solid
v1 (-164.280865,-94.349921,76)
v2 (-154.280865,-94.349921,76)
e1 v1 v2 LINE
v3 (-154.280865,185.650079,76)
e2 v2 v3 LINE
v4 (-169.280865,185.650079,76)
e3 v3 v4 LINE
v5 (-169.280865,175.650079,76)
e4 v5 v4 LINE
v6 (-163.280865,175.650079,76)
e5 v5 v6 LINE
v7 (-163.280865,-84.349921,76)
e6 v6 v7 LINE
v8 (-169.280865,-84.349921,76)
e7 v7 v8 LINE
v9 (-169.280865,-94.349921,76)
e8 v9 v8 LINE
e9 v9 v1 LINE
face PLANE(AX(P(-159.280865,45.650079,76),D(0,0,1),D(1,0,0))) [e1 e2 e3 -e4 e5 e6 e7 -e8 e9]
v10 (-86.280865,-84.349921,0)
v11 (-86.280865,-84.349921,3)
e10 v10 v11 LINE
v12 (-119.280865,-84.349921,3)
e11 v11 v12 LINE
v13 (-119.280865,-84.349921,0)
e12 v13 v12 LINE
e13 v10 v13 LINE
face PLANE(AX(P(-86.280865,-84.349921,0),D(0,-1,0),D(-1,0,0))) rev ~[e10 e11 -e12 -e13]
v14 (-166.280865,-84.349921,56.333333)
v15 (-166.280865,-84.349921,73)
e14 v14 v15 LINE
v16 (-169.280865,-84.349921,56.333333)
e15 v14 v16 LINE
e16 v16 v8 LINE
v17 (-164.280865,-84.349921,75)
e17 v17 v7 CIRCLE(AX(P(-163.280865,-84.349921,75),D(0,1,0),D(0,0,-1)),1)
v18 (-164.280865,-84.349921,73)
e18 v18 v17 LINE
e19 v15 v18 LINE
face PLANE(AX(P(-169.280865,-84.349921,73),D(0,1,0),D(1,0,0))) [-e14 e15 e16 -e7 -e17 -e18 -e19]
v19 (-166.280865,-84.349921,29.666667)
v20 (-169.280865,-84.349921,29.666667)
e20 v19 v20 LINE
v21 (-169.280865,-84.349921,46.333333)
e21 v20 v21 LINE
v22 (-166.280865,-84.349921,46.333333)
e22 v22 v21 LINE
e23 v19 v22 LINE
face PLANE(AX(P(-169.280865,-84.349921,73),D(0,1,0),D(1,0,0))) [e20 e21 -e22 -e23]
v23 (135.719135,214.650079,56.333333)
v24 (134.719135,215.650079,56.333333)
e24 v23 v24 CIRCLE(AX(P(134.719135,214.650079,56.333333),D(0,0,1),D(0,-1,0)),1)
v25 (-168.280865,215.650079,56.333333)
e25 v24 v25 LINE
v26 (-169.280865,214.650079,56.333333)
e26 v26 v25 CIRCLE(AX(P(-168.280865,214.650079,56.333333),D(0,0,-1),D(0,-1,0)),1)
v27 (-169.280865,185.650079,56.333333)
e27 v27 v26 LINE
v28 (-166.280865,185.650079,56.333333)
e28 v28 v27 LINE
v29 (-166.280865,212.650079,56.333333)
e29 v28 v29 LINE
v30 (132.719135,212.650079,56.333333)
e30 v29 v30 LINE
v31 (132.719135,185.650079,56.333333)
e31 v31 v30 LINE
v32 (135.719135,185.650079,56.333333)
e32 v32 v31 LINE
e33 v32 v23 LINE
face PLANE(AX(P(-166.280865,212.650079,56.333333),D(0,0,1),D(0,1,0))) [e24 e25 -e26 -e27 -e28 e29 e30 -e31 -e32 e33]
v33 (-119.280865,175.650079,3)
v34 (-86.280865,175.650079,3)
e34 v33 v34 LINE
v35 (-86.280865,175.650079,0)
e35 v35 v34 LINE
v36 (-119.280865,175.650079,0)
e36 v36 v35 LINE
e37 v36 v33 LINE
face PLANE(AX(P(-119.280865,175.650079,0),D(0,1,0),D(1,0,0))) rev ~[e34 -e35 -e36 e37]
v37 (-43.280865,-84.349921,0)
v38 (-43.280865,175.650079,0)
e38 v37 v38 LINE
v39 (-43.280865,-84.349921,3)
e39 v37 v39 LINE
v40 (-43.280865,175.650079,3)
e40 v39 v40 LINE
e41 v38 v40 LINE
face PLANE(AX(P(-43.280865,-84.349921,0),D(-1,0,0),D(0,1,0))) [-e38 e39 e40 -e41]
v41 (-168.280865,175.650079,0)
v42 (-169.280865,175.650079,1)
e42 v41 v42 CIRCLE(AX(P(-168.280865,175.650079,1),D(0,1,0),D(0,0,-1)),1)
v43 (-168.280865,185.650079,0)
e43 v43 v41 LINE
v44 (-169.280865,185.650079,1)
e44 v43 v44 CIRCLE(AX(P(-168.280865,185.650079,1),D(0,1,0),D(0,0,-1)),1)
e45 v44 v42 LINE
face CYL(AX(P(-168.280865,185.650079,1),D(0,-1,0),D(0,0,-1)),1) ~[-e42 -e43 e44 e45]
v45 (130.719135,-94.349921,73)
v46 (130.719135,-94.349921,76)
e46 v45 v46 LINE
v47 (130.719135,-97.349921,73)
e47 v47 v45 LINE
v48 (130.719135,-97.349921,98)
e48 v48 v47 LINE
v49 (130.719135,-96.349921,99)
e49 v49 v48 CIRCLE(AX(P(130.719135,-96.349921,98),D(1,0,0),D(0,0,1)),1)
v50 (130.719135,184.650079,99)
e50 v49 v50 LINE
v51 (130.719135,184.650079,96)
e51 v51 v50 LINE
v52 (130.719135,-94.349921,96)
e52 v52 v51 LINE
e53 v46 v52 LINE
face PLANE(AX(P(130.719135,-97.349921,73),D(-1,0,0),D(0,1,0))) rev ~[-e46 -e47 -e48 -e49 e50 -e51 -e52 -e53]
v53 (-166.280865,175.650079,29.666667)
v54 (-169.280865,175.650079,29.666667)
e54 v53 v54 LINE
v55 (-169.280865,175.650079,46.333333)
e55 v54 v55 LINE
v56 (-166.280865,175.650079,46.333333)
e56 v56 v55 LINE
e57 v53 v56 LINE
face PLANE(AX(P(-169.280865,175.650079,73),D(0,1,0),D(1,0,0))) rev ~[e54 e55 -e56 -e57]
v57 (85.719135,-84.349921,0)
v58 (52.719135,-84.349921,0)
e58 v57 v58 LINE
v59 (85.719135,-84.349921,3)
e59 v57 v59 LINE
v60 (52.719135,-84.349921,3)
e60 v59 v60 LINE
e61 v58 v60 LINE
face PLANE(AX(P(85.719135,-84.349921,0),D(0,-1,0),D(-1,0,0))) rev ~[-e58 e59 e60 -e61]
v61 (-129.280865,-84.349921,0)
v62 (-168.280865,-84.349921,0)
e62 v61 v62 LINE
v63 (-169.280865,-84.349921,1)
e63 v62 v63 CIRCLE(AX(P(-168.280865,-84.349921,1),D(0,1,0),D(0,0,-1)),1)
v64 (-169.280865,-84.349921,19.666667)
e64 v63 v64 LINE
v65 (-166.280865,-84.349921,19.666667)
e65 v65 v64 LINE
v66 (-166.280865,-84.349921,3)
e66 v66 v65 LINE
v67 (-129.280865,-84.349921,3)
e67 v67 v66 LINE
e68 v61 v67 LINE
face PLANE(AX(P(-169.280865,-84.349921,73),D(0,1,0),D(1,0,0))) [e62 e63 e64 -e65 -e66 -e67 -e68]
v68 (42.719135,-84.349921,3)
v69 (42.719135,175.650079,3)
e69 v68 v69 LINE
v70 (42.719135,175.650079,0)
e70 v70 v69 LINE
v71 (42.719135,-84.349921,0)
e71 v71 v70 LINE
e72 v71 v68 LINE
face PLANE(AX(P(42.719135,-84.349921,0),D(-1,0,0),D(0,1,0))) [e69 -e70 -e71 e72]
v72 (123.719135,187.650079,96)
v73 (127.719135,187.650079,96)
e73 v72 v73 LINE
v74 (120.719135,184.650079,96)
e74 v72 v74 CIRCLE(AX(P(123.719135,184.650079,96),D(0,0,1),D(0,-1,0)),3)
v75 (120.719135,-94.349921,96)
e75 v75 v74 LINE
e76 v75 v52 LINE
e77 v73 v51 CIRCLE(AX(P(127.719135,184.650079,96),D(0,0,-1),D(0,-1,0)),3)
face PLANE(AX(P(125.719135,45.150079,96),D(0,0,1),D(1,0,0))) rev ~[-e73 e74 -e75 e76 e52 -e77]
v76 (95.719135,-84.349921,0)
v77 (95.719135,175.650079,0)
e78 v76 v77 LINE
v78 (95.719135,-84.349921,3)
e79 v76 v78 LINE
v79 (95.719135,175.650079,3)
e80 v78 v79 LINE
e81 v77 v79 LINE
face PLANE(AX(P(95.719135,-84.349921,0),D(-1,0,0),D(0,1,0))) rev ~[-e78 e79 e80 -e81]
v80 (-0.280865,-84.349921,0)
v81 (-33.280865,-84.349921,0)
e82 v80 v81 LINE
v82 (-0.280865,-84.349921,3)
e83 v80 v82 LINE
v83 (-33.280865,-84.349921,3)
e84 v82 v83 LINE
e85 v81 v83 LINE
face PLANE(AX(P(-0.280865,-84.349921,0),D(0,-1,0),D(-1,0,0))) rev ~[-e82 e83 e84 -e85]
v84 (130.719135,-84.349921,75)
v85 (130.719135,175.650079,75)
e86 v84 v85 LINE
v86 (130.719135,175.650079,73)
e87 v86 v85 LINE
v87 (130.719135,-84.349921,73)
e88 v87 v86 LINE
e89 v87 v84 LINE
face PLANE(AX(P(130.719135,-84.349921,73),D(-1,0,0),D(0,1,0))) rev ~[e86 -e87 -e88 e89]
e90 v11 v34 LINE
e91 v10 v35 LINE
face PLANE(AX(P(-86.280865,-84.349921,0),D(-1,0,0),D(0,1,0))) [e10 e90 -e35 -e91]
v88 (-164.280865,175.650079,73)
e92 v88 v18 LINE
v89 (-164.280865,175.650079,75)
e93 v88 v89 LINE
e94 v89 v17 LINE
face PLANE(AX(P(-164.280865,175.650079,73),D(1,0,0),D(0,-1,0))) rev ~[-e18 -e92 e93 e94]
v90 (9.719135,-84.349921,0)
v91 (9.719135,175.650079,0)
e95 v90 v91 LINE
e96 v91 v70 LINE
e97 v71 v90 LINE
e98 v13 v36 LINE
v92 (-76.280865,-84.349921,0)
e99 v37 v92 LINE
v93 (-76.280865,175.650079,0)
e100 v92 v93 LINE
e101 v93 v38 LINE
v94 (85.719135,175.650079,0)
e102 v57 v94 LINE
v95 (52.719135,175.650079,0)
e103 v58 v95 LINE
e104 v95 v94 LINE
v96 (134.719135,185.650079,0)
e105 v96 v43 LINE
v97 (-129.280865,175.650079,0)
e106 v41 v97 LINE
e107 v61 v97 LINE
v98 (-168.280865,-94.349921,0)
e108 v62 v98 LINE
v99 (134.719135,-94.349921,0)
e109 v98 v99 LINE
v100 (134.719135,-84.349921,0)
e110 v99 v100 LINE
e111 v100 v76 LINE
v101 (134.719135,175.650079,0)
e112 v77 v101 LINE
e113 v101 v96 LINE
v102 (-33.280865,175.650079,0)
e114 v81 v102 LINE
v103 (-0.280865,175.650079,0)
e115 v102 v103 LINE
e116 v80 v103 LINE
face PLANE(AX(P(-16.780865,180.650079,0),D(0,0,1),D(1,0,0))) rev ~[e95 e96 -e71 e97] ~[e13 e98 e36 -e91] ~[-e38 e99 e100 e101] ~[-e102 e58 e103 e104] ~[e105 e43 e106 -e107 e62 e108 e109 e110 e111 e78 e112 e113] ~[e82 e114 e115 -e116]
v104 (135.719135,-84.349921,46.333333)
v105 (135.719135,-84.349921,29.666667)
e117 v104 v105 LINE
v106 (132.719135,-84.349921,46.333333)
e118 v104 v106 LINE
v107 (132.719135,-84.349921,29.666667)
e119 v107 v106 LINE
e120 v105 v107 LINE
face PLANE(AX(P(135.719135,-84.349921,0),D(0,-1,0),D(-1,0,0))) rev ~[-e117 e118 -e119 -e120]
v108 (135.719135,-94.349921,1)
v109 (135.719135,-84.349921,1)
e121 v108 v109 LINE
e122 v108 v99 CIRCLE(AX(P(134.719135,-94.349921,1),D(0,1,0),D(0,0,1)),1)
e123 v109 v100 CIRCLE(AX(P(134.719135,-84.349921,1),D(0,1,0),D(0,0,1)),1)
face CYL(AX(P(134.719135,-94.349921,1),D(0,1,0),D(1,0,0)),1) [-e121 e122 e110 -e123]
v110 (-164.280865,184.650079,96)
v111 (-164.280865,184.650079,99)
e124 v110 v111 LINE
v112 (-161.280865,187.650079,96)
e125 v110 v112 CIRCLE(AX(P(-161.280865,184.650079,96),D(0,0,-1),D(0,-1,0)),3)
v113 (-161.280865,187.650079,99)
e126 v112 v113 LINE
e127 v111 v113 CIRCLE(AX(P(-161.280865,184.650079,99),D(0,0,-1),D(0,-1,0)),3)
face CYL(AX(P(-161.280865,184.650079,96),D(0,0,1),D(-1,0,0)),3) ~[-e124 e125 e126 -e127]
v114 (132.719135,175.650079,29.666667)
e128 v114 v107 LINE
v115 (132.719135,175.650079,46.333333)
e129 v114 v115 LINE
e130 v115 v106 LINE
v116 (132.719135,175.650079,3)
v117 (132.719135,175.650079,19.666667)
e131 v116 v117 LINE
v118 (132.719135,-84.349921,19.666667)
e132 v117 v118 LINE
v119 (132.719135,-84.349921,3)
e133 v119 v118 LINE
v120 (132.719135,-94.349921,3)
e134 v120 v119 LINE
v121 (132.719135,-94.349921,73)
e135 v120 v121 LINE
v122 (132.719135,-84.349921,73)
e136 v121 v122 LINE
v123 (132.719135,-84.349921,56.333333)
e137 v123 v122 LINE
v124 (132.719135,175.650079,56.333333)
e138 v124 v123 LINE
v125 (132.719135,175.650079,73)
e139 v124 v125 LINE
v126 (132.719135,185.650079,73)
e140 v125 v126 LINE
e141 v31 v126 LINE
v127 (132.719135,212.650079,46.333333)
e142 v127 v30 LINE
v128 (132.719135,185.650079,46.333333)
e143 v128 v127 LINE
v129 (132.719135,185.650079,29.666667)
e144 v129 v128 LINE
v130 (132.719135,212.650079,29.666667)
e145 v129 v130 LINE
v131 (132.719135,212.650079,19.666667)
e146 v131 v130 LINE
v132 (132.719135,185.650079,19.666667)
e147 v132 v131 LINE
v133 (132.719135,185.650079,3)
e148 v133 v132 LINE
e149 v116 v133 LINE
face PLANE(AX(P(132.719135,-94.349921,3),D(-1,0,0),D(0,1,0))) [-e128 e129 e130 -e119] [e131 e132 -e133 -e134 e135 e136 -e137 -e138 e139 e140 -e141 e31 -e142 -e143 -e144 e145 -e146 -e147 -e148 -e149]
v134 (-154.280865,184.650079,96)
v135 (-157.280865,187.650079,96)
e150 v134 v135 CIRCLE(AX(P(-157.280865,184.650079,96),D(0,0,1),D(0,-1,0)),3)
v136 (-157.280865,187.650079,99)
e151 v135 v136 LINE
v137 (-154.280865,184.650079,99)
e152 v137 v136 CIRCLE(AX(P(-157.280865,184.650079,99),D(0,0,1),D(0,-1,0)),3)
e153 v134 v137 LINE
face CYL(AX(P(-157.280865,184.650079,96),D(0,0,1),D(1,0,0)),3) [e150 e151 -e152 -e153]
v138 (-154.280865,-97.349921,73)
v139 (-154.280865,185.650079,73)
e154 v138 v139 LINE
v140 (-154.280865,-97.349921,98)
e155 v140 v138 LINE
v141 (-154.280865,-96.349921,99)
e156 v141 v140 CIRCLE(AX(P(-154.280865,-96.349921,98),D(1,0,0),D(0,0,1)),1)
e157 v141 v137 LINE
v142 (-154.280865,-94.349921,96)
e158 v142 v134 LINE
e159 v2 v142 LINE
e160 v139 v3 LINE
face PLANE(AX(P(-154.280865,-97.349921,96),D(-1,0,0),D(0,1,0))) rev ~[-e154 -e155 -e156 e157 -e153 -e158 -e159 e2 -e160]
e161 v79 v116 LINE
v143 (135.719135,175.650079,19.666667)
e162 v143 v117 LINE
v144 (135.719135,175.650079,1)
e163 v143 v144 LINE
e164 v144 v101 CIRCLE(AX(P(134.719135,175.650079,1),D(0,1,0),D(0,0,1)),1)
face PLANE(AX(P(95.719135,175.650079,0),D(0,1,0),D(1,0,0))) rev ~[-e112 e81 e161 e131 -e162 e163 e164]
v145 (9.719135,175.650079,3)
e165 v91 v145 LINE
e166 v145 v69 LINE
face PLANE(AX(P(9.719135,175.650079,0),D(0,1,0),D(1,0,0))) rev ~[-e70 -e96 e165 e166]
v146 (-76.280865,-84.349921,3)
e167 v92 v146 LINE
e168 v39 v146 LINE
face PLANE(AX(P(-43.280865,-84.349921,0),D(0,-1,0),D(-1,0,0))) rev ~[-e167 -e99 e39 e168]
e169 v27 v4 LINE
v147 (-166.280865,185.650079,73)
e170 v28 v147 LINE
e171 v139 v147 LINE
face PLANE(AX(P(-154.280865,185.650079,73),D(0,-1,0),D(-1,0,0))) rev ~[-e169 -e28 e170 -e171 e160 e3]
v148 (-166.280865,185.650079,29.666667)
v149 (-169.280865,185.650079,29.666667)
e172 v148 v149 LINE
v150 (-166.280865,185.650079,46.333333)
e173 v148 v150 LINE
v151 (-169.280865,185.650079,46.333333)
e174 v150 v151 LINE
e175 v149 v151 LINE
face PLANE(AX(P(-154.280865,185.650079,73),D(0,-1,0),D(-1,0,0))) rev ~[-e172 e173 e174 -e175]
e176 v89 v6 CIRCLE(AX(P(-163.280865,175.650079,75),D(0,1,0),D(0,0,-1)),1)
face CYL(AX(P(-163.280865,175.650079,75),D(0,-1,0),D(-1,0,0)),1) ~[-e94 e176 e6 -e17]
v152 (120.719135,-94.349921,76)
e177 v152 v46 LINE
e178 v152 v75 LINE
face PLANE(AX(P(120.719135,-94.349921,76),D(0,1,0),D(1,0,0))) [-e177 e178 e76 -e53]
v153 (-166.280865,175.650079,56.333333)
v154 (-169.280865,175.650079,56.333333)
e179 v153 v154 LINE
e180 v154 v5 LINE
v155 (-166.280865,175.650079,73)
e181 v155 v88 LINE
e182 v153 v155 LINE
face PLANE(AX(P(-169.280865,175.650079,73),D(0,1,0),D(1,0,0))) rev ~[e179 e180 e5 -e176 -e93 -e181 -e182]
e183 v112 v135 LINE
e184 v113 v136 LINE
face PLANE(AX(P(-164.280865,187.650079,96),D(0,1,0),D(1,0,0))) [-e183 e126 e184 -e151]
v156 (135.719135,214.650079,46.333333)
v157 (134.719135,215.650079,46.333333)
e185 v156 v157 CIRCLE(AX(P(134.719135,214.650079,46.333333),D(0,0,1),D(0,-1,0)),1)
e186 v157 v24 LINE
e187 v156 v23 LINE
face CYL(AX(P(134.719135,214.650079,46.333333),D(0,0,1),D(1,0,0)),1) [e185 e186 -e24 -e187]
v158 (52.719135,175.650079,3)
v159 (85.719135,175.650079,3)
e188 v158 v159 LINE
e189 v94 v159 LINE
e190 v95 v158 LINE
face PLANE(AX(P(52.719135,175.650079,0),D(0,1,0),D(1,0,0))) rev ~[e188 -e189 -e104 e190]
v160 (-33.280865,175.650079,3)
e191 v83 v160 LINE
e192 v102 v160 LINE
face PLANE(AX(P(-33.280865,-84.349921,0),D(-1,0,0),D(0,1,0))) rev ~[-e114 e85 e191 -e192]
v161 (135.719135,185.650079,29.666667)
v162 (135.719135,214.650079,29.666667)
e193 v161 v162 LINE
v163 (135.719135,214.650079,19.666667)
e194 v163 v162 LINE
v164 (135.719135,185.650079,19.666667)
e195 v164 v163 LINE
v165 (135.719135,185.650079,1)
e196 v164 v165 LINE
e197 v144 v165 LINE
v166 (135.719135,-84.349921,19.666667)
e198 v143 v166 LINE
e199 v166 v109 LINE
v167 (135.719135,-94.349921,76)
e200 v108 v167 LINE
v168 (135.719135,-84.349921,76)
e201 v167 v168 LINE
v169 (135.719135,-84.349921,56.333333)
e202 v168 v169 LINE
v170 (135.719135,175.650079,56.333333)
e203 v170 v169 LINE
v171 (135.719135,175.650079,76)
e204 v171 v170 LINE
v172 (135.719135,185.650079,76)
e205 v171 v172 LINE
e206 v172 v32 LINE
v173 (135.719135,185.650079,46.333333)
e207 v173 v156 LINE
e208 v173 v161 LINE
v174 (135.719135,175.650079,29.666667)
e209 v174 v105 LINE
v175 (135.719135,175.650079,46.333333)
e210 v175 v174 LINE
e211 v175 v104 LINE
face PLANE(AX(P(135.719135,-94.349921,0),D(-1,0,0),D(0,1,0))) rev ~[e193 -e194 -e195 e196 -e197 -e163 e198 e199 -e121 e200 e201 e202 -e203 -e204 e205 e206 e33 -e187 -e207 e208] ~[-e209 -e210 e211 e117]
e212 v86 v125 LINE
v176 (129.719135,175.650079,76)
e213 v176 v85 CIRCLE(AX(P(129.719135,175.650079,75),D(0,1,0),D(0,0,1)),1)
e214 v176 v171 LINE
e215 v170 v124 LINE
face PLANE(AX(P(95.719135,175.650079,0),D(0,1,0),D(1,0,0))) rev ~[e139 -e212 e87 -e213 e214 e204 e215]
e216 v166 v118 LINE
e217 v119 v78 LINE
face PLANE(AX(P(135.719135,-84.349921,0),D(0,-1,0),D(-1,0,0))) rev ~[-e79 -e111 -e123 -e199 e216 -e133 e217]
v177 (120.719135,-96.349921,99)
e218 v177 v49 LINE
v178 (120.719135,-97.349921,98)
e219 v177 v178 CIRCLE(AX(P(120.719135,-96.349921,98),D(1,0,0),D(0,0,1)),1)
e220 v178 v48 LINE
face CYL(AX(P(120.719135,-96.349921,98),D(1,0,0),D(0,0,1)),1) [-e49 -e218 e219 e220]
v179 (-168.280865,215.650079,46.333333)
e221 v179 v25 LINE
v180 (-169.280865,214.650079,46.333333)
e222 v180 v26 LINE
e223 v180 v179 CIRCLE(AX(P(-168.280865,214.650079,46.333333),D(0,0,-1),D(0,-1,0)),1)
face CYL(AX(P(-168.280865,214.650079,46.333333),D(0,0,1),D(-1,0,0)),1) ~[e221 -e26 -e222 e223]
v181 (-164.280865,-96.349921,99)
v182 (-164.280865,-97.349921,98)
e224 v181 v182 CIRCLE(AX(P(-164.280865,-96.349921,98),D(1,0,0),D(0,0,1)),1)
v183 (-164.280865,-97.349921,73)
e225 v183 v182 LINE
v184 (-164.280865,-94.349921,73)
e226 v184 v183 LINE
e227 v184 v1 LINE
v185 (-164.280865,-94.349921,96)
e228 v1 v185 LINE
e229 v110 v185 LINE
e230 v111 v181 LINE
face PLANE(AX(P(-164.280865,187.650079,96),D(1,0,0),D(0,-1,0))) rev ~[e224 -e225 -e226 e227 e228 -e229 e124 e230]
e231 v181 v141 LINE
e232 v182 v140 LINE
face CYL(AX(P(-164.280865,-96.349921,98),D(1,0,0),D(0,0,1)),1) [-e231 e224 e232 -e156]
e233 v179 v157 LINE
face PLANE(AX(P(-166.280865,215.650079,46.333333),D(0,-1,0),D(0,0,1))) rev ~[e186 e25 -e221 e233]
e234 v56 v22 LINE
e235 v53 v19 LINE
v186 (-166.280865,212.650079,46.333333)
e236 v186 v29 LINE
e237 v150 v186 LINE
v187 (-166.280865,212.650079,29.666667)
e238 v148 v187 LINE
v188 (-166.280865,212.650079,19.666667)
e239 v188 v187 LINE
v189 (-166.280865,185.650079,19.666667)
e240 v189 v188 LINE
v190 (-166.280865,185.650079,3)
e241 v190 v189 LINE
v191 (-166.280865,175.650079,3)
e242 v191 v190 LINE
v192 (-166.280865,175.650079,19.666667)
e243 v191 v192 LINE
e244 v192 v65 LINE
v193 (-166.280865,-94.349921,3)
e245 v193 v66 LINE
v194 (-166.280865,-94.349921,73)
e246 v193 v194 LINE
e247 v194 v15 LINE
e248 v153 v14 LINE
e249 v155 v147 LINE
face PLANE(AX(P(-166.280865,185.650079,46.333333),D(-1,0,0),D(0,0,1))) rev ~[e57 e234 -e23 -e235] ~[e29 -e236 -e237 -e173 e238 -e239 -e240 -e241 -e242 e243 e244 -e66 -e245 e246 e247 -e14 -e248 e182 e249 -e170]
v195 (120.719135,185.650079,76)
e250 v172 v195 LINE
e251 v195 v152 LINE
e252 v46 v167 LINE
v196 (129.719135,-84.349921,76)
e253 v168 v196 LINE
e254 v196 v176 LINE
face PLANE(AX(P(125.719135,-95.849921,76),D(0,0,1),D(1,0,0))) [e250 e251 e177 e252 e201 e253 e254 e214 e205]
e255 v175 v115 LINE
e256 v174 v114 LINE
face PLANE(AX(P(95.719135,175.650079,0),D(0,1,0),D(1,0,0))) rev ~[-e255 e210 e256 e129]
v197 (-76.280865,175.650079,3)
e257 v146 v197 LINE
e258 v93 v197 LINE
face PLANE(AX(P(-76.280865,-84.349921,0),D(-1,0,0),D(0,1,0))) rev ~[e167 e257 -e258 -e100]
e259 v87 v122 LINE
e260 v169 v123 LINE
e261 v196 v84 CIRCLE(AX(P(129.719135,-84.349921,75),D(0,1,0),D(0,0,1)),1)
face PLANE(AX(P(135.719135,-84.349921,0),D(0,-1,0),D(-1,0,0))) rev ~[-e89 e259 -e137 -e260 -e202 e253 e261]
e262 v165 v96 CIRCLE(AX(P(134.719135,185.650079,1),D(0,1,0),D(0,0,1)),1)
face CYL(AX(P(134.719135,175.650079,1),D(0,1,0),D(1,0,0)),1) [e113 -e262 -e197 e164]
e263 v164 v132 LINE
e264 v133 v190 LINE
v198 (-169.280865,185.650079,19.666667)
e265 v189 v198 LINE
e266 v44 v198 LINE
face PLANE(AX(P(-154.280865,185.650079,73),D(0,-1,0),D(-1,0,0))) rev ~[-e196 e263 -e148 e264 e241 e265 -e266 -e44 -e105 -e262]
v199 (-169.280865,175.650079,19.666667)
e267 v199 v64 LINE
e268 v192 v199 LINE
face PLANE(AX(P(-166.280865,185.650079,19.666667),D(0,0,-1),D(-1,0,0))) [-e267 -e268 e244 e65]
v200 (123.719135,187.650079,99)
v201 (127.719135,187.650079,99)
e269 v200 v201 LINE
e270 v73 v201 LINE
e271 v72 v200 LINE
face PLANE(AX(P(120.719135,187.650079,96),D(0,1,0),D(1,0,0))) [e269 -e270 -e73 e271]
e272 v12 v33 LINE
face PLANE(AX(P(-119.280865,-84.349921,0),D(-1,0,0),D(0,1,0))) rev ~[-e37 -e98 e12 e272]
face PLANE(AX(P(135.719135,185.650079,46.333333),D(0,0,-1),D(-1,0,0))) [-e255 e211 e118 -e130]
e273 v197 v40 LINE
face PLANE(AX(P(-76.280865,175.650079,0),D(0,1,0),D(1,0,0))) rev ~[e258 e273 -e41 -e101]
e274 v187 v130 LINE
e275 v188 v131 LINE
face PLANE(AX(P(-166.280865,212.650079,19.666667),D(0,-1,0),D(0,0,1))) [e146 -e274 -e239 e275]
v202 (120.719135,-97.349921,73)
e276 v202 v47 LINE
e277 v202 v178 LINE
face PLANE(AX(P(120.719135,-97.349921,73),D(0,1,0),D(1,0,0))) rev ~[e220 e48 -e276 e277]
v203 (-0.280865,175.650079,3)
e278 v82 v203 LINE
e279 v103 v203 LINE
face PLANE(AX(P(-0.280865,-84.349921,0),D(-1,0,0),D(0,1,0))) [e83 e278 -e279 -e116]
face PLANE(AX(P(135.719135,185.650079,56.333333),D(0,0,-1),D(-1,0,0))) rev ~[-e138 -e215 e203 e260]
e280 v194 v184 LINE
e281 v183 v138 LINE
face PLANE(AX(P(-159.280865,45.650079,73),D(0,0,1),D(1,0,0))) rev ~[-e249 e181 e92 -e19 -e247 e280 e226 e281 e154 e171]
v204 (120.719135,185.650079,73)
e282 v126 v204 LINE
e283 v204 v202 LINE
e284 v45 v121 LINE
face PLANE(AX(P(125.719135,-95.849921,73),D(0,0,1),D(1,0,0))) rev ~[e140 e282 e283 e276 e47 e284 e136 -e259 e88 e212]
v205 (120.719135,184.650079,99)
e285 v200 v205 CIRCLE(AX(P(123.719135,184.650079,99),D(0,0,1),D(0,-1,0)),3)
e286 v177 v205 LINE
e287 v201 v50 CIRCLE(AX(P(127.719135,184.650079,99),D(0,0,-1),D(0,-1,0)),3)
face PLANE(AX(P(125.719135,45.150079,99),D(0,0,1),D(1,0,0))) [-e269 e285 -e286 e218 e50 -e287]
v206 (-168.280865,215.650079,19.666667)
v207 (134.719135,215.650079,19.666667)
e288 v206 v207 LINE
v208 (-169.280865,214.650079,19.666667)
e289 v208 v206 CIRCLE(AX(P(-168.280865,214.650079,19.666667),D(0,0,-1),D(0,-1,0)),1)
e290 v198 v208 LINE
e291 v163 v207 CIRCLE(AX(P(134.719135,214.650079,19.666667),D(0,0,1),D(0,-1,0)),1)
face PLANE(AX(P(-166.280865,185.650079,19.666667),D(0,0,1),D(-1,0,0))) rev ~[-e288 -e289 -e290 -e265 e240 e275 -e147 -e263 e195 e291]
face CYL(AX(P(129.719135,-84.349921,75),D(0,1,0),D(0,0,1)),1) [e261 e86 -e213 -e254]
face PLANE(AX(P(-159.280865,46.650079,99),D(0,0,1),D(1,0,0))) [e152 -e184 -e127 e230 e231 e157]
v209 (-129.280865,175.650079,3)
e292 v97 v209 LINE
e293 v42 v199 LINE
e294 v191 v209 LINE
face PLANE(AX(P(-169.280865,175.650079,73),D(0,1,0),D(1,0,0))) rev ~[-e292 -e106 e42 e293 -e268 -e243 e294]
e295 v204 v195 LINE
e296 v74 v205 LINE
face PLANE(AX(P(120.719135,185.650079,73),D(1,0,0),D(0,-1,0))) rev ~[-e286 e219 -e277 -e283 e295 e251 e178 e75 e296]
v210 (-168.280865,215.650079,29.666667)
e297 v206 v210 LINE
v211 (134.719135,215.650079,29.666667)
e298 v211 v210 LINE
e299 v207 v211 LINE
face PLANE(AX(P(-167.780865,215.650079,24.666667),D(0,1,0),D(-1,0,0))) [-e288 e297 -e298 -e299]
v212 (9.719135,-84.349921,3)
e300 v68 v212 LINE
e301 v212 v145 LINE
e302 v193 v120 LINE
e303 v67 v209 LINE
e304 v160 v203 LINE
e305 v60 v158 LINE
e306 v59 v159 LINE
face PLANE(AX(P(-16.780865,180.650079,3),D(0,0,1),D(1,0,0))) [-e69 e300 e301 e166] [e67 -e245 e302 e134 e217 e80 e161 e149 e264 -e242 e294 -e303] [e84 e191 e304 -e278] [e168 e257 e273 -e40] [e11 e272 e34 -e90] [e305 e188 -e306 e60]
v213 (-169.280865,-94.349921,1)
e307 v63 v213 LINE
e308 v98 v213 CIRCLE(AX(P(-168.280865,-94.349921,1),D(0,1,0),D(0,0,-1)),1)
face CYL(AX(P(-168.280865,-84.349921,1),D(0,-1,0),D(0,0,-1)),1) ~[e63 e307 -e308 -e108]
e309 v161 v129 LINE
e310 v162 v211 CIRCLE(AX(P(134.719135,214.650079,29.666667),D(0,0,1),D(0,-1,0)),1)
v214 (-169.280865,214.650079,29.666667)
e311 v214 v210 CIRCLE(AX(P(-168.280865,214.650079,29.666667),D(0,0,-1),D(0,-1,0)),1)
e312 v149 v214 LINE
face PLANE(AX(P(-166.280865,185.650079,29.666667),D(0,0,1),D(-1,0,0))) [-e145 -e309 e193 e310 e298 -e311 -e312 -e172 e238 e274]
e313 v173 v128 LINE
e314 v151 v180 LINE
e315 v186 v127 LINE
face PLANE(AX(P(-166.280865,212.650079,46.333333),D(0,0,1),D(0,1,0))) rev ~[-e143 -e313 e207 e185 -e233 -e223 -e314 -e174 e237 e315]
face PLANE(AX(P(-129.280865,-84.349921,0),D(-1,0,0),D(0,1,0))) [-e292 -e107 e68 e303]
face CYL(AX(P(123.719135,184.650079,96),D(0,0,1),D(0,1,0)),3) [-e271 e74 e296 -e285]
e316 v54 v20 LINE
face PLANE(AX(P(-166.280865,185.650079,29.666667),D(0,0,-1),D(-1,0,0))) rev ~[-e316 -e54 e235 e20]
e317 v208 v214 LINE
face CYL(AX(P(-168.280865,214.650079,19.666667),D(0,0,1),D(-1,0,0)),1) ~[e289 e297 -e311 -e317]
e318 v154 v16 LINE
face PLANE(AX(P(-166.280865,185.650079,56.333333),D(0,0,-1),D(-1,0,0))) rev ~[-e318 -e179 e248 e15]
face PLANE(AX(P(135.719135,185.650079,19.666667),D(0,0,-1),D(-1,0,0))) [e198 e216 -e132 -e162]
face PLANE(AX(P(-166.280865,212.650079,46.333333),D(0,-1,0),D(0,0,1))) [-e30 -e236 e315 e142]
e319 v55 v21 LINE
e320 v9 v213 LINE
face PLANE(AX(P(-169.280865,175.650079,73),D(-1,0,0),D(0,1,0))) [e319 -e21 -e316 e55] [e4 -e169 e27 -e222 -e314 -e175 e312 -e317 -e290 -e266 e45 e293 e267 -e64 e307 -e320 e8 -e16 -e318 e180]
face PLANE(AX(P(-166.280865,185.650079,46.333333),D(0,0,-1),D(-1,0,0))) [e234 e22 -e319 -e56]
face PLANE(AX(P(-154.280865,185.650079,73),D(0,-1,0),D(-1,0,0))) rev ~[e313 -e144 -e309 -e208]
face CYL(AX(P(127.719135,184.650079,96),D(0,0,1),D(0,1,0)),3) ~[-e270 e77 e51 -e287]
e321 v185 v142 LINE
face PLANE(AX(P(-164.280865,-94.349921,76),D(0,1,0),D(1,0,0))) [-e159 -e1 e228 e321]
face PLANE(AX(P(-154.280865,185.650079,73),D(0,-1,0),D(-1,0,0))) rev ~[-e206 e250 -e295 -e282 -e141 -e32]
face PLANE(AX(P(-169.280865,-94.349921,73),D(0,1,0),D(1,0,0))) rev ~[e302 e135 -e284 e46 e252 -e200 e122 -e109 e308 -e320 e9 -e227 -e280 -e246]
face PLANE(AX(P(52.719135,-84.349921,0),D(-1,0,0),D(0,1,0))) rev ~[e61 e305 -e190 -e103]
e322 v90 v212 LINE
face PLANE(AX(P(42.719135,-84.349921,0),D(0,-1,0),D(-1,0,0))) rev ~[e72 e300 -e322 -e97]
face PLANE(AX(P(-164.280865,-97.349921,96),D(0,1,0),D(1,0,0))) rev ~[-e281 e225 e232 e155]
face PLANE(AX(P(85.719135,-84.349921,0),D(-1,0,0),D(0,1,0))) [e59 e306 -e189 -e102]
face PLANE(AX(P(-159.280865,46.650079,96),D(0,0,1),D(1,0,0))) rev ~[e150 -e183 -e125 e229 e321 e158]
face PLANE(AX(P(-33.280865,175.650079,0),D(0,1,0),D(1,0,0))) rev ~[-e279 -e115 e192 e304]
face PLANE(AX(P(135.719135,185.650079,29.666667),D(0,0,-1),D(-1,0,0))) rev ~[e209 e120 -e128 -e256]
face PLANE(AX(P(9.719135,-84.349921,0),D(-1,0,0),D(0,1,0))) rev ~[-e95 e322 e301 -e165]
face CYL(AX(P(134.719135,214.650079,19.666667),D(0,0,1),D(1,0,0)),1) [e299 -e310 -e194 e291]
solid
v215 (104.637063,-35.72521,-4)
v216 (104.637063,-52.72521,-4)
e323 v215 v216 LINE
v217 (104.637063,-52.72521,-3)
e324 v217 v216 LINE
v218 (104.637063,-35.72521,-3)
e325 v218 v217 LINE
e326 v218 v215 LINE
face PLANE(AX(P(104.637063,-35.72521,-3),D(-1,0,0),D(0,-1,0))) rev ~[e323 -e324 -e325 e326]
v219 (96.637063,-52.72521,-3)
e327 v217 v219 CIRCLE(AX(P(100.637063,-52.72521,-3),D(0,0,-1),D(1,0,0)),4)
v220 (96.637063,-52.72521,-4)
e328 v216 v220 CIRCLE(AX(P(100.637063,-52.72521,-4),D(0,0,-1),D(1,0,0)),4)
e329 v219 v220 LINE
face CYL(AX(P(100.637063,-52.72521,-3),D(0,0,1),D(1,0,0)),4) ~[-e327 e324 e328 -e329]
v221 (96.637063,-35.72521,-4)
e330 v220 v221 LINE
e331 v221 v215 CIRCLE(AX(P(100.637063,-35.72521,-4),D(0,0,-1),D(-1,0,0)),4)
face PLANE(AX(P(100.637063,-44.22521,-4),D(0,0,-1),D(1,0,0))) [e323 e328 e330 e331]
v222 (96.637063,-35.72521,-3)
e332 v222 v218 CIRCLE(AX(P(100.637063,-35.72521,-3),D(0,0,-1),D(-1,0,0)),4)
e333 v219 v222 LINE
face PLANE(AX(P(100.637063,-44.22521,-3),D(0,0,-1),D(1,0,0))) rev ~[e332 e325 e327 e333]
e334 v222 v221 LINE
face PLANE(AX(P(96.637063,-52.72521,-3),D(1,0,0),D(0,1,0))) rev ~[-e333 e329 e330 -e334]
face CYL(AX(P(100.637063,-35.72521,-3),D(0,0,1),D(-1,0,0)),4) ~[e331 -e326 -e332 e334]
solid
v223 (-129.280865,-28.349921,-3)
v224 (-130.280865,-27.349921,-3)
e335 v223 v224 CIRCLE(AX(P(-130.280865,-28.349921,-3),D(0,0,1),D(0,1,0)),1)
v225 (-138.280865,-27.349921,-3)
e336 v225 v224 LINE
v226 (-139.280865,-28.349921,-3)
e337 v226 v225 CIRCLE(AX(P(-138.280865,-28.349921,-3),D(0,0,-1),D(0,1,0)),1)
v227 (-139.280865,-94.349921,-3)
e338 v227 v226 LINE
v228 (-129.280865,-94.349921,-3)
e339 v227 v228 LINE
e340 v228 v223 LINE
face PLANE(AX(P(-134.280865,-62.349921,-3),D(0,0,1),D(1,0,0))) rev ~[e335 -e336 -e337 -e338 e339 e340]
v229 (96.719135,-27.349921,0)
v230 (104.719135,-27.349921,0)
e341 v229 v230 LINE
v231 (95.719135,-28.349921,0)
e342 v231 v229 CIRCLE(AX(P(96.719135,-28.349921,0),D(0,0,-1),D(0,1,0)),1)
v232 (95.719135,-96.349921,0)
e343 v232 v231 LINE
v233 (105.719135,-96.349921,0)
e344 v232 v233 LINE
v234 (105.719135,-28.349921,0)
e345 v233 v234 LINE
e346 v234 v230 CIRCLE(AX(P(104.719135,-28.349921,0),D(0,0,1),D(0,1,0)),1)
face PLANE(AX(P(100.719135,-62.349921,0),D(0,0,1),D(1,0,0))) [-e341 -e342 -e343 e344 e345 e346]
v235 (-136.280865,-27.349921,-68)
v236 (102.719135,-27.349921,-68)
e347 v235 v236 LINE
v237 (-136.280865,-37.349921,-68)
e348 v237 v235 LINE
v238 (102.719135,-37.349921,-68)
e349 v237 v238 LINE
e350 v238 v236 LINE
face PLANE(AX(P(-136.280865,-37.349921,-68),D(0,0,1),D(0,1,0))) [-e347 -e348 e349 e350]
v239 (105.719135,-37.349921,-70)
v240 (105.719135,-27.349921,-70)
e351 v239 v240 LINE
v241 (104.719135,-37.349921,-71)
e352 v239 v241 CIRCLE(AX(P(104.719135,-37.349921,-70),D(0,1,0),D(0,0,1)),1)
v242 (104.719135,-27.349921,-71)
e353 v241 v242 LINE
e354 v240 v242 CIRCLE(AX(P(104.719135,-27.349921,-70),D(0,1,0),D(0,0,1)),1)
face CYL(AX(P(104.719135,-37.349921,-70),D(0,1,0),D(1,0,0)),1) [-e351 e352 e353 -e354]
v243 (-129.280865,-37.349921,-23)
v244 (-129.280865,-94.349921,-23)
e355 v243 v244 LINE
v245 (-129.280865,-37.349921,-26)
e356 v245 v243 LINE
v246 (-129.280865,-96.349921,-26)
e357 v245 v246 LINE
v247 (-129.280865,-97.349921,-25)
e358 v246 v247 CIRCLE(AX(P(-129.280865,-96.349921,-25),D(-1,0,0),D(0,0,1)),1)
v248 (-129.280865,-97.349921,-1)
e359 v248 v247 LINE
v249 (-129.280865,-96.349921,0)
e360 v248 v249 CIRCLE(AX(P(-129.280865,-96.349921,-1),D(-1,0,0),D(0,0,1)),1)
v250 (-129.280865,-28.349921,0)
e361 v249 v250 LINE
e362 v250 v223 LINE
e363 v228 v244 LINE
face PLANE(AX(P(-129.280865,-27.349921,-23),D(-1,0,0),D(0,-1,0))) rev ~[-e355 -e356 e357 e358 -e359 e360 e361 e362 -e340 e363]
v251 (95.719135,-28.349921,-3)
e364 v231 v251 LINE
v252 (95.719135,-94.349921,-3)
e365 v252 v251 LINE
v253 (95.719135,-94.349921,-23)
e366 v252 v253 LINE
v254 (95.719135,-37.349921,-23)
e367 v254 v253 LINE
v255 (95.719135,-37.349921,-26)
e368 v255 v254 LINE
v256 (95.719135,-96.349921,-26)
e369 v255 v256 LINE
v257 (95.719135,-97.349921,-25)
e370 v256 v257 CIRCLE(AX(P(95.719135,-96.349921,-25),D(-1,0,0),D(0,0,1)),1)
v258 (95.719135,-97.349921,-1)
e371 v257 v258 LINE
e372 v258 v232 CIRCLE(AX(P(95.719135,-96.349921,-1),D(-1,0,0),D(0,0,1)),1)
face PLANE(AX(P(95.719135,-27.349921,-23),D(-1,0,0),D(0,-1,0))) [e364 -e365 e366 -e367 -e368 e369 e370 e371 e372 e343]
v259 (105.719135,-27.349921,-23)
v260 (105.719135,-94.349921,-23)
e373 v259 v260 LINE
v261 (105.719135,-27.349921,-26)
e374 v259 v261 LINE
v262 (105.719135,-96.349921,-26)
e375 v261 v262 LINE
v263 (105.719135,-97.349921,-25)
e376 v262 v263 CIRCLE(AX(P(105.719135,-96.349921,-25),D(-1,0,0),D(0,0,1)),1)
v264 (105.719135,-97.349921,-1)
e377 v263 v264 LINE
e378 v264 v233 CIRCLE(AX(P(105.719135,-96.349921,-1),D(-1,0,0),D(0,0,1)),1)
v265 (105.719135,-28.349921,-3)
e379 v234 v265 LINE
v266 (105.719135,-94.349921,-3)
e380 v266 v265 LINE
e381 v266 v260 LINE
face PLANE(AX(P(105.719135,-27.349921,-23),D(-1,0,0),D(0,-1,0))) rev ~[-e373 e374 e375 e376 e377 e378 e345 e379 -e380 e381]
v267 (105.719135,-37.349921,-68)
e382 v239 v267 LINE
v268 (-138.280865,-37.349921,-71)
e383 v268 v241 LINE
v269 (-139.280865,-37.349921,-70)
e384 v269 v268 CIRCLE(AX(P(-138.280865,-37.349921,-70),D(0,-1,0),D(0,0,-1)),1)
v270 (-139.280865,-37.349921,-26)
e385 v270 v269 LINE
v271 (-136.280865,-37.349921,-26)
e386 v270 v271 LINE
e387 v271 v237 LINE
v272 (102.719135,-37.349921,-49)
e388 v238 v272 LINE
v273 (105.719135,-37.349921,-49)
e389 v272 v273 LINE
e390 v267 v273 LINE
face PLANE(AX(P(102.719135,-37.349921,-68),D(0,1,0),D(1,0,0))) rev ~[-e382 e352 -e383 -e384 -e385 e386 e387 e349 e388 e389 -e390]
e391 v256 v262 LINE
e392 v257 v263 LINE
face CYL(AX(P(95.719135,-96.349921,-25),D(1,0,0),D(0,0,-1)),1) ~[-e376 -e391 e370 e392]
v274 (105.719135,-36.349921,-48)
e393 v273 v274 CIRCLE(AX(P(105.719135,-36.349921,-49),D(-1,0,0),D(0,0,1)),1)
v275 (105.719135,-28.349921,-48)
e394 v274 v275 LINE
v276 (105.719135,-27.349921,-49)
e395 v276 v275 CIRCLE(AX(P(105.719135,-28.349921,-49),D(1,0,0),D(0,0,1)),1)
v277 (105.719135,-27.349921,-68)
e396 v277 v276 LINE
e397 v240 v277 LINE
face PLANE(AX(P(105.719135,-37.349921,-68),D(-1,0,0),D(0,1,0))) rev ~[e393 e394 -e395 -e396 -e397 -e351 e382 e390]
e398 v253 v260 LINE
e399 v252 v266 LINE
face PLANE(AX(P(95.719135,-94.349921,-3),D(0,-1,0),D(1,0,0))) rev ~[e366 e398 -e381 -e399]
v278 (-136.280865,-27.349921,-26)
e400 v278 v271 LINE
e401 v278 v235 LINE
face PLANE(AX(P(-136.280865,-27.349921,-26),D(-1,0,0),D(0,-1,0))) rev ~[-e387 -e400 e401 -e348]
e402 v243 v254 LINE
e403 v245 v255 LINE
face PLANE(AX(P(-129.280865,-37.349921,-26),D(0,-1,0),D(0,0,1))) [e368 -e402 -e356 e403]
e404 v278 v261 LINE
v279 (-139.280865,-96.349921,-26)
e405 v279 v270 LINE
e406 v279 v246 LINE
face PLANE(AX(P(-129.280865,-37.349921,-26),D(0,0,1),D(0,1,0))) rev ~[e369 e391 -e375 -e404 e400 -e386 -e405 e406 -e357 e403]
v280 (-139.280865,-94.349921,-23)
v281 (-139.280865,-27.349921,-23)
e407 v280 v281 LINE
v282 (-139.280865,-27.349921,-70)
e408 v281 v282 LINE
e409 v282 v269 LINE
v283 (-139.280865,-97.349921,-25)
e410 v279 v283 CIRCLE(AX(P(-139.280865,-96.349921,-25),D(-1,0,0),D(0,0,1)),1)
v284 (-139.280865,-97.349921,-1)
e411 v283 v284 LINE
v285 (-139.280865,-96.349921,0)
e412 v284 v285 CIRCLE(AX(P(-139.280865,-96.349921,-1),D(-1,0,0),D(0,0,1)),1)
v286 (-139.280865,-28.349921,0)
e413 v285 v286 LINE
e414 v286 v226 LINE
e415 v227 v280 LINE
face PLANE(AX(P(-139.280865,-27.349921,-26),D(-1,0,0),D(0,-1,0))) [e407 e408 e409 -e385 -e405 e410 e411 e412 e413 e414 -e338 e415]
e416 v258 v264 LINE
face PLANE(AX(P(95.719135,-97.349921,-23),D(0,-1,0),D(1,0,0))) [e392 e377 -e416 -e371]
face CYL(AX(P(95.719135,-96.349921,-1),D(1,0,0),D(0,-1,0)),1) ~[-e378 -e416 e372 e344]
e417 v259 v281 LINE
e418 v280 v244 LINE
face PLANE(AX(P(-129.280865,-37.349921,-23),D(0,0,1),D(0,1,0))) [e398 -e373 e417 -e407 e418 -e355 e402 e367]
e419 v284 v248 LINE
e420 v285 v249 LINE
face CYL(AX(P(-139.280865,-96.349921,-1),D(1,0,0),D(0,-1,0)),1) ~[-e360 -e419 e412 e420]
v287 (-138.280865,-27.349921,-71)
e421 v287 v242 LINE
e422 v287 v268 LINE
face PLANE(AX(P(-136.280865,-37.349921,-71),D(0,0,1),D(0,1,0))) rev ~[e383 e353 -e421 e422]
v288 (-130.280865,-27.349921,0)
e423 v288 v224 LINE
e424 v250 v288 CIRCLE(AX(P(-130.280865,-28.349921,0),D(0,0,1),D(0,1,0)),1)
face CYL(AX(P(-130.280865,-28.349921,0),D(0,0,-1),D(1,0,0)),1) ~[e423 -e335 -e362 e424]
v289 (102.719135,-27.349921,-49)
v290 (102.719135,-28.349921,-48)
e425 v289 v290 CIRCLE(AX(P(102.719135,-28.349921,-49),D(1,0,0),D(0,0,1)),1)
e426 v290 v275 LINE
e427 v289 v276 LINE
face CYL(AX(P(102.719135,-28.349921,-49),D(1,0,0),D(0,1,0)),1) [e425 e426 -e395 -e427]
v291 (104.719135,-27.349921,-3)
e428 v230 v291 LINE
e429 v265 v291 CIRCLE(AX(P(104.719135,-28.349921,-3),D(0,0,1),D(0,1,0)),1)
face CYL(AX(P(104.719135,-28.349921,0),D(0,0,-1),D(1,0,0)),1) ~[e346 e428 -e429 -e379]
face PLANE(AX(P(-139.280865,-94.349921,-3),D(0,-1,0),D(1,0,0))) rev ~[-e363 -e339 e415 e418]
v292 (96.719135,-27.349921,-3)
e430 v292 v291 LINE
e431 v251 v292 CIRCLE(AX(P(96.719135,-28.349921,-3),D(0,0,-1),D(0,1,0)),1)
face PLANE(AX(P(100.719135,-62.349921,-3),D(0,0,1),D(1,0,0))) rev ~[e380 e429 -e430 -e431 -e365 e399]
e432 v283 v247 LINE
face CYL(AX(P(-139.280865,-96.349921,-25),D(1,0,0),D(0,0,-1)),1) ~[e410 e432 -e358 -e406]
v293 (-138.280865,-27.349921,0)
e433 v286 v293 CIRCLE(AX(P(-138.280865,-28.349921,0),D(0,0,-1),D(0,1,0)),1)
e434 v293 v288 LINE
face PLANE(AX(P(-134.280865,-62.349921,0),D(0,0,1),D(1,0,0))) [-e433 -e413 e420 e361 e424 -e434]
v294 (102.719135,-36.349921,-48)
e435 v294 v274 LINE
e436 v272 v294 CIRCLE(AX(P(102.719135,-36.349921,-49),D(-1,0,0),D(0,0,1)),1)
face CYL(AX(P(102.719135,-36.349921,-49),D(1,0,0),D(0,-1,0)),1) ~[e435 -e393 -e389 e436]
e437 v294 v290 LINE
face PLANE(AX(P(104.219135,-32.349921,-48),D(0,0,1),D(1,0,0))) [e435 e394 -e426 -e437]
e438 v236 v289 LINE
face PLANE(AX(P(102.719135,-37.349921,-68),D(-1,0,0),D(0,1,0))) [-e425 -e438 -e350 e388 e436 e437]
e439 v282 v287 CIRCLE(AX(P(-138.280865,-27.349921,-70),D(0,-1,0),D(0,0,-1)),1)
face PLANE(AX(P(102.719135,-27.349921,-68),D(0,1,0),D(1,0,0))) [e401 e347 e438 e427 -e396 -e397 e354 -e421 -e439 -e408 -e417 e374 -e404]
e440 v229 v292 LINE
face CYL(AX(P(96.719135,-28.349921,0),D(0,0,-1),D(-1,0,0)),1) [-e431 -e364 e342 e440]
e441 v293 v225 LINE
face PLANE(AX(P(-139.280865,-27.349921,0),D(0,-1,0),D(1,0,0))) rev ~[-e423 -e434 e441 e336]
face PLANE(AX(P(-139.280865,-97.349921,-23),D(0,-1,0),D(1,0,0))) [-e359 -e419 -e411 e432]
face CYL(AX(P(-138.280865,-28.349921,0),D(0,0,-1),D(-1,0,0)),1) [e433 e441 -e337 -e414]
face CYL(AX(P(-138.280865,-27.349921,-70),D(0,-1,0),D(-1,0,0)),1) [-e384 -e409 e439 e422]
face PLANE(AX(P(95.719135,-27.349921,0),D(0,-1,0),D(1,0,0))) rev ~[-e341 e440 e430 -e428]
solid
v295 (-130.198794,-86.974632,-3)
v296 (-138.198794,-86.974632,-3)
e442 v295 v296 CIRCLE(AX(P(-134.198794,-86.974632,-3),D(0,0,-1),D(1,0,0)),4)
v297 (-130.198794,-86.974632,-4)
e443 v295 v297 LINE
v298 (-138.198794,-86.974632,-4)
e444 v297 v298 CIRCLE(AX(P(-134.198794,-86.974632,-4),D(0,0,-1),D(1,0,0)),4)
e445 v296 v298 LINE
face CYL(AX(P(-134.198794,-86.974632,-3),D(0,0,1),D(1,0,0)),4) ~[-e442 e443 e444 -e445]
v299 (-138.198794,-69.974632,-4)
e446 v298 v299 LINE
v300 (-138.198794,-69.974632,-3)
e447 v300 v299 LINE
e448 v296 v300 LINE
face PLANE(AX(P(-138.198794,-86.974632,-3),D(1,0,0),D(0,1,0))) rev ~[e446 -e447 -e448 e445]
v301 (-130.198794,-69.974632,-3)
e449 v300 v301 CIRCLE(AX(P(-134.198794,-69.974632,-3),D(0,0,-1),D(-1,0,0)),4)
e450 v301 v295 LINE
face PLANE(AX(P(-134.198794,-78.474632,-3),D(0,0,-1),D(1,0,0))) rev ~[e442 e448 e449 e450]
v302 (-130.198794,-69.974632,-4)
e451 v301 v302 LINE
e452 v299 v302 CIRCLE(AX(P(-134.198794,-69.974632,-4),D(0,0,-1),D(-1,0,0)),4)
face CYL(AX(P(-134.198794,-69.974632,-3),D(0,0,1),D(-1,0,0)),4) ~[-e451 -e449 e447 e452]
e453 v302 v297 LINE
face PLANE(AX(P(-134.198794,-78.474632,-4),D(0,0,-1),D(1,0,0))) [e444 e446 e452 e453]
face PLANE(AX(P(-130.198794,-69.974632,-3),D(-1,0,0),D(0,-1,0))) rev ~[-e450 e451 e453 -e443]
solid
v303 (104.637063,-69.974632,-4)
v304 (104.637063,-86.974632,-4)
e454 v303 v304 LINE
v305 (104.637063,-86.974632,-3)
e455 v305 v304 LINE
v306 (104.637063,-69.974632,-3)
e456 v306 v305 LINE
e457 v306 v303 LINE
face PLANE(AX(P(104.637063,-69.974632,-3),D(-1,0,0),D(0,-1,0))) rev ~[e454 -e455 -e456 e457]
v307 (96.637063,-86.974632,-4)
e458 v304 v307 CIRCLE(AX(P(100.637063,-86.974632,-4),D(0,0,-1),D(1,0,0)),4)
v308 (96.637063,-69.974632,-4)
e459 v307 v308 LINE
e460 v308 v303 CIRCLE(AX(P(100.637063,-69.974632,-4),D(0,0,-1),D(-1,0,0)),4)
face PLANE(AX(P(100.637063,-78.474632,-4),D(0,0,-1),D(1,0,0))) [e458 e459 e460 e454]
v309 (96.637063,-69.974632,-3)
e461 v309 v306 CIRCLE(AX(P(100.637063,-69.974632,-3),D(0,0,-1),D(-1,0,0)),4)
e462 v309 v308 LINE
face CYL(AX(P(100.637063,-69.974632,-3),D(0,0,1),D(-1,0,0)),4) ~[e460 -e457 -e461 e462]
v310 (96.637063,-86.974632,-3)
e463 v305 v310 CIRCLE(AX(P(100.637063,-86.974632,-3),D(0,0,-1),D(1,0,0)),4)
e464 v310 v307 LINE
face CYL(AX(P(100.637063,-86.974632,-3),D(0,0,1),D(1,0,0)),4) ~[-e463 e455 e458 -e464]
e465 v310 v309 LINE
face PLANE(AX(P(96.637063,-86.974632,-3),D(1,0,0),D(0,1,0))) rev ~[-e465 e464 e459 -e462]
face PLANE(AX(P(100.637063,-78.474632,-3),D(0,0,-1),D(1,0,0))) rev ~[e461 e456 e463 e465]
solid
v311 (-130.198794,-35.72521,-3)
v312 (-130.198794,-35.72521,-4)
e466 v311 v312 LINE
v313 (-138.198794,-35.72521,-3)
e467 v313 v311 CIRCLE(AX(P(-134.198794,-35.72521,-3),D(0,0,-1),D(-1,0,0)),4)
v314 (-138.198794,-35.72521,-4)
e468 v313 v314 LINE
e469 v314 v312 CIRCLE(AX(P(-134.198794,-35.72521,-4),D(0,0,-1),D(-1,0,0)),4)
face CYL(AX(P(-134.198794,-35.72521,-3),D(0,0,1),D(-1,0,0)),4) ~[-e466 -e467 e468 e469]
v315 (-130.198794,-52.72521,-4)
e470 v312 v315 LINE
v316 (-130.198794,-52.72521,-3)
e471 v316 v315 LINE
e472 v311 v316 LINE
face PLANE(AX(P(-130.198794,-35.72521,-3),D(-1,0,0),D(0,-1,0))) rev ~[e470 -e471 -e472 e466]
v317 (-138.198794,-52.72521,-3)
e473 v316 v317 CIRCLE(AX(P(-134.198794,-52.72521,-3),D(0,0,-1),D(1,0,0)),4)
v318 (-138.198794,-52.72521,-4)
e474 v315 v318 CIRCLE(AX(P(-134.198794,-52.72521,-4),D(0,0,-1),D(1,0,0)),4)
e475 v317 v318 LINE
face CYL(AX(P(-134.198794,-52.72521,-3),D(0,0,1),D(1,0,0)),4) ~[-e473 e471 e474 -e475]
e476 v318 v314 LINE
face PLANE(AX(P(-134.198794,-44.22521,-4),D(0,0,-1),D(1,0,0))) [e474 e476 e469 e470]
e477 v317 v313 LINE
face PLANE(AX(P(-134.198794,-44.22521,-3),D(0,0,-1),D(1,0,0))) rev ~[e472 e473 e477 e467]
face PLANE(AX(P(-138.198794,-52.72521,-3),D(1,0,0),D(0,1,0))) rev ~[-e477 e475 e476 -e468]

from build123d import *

# Parameters (mm, degrees)
F0_W           = 10
F0_H           = 260
F1_DEPTH       = 3
F2_W           = 3
F2_H           = 10
F3_DEPTH       = 70
F4_W           = 2
F4_H           = 10
F4_W_2         = 3
F4_W_3         = 10
F4_H_2         = 3
F4_W_4         = 5
F5_DEPTH       = 3
F6_W           = 10
F6_H           = 3
F7_DEPTH       = 20
F8_W           = 10
F8_H           = 282
F8_H_2         = 285
F8_H_3         = 3
F9_DEPTH       = 3
F10_W          = 3
F10_H          = 10
F11_DEPTH      = 30
F11_DEPTH_BACK = 270
F12_W          = 3
F12_H          = 10
F13_DEPTH      = 299
F14_R          = 1
F15_R          = 3
F16_W          = 10
F16_H          = 70
F17_DEPTH      = 3
F18_W          = 10
F18_H          = 3
F19_DEPTH      = 20
F20_W          = 10
F20_H          = 70
F21_DEPTH      = 3
F20_H_2        = 67
F20_H_3        = 3
F22_W          = 10
F22_H          = 3
F23_DEPTH      = 225
F24_W          = 3
F24_H          = 10
F25_DEPTH      = 45
F26_W          = 10
F26_H          = 3
F27_DEPTH      = 242
F28_W          = 3
F28_H          = 10
F29_DEPTH      = 20
F30_R          = 1
F32_DEPTH      = 1


with BuildPart() as f1:
    # F0 (on Top) → F1 (new body)
    with BuildSketch(Plane.XY):
        Polygon((135.7191348076, 185.6500792865), (-169.2808651924, 185.6500792865), (-169.2808651924, 175.6500792865), (-129.2808651924, 175.6500792865), (-119.2808651924, 175.6500792865), (-86.2808651924, 175.6500792865), (-76.2808651924, 175.6500792865), (-43.2808651924, 175.6500792865), (-33.2808651924, 175.6500792865), (-0.2808651924, 175.6500792865), (9.7191348076, 175.6500792865), (42.7191348076, 175.6500792865), (52.7191348076, 175.6500792865), (85.7191348076, 175.6500792865), (95.7191348076, 175.6500792865), (135.7191348076, 175.6500792865), align=None)
        with Locations((-124.2808651924, 45.6500792865)):
            Rectangle(F0_W, F0_H)
        with Locations((-81.2808651924, 45.6500792865)):
            Rectangle(F0_W, F0_H)
        with Locations((-38.2808651924, 45.6500792865)):
            Rectangle(F0_W, F0_H)
        with Locations((4.7191348076, 45.6500792865)):
            Rectangle(F0_W, F0_H)
        with Locations((47.7191348076, 45.6500792865)):
            Rectangle(F0_W, F0_H)
        with Locations((90.7191348076, 45.6500792865)):
            Rectangle(F0_W, F0_H)
        Polygon((-129.2808651924, -84.3499207135), (-169.2808651924, -84.3499207135), (-169.2808651924, -94.3499207135), (135.7191348076, -94.3499207135), (135.7191348076, -84.3499207135), (95.7191348076, -84.3499207135), (85.7191348076, -84.3499207135), (52.7191348076, -84.3499207135), (42.7191348076, -84.3499207135), (9.7191348076, -84.3499207135), (-0.2808651924, -84.3499207135), (-33.2808651924, -84.3499207135), (-43.2808651924, -84.3499207135), (-76.2808651924, -84.3499207135), (-86.2808651924, -84.3499207135), (-119.2808651924, -84.3499207135), align=None)
    extrude(amount=F1_DEPTH)

    # F2 (on face) → F3 (join)
    with BuildSketch(Plane.XY.offset(3)):
        with Locations((-167.7808651924, 180.6500792865)):
            Rectangle(F2_W, F2_H)
        with Locations((134.2191348076, 180.6500792865)):
            Rectangle(F2_W, F2_H)
        with Locations((134.2191348076, -89.3499207135)):
            Rectangle(F2_W, F2_H)
        with Locations((-167.7808651924, -89.3499207135)):
            Rectangle(F2_W, F2_H)
    extrude(amount=F3_DEPTH)

    # F4 (on face) → F5 (join)
    with BuildSketch(Plane.XY.offset(73)):
        Polygon((-154.2808651924, 185.6500792865), (-164.2808651924, 185.6500792865), (-164.2808651924, 175.6500792865), (-164.2808651924, -84.3499207135), (-164.2808651924, -94.3499207135), (-154.2808651924, -94.3499207135), align=None)
        with Locations((-165.2808651924, 180.6500792865)):
            Rectangle(F4_W, F4_H)
        with Locations((-167.7808651924, 180.6500792865)):
            Rectangle(F4_W_2, F4_H)
        with Locations((-159.2808651924, -95.8499207135)):
            Rectangle(F4_W_3, F4_H_2)
        with Locations((125.7191348076, -95.8499207135)):
            Rectangle(F4_W_3, F4_H_2)
        Polygon((130.7191348076, 185.6500792865), (120.7191348076, 185.6500792865), (120.7191348076, -94.3499207135), (130.7191348076, -94.3499207135), (130.7191348076, -84.3499207135), (130.7191348076, 175.6500792865), align=None)
        with Locations((133.2191348076, -89.3499207135)):
            Rectangle(F4_W_4, F4_H)
        with Locations((133.2191348076, 180.6500792865)):
            Rectangle(F4_W_4, F4_H)
        with Locations((-166.7808651924, -89.3499207135)):
            Rectangle(F4_W_4, F4_H)
    extrude(amount=F5_DEPTH)

    # F6 (on face) → F7 (join)
    with BuildSketch(Plane.XY.offset(76)):
        with Locations((-159.2808651924, -95.8499207135)):
            Rectangle(F6_W, F6_H)
        with Locations((125.7191348076, -95.8499207135)):
            Rectangle(F6_W, F6_H)
    extrude(amount=F7_DEPTH)

    # F8 (on face) → F9 (join)
    with BuildSketch(Plane.XY.offset(96)):
        with Locations((-159.2808651924, 46.6500792865)):
            Rectangle(F8_W, F8_H)
        with Locations((125.7191348076, 45.1500792865)):
            Rectangle(F8_W, F8_H_2)
        with Locations((-159.2808651924, -95.8499207135)):
            Rectangle(F8_W, F8_H_3)
    extrude(amount=F9_DEPTH)

    # F10 (on face) → F11 (join, two sides)
    with BuildSketch(Plane(origin=(0, 185.6500792865, 0), x_dir=(-1, 0, 0), z_dir=(0, 1, 0))) as f11_sk:
        with Locations((167.7808651924, 51.3333333333)):
            Rectangle(F10_W, F10_H)
        with Locations((167.7808651924, 24.6666666667)):
            Rectangle(F10_W, F10_H)
        with Locations((-134.2191348076, 51.3333333333)):
            Rectangle(F10_W, F10_H)
        with Locations((-134.2191348076, 24.6666666667)):
            Rectangle(F10_W, F10_H)
    extrude(amount=F11_DEPTH)
    extrude(f11_sk.sketch, amount=-F11_DEPTH_BACK)

    # F12 (on face) → F13 (join, through all)
    with BuildSketch(Plane.YZ.offset(-166.2808651924)):
        with Locations((214.1500792864, 51.3333333333)):
            Rectangle(F12_W, F12_H)
        with Locations((214.1500792864, 24.6666666667)):
            Rectangle(F12_W, F12_H)
    extrude(amount=F13_DEPTH)

    # F14
    f14_edges = [f1.edges().sort_by_distance(p)[0] for p in [
        (-169.280865, 180.650079, 0),
        (-169.280865, -89.349921, 0),
        (135.719135, -89.349921, 0),
        (135.719135, 180.650079, 0),
        (135.719135, 215.650079, 24.666667),
        (135.719135, 215.650079, 51.333333),
        (-169.280865, 215.650079, 51.333333),
        (-169.280865, 215.650079, 24.666667),
        (-164.280865, 45.650079, 76),
        (-159.280865, -97.349921, 99),
        (125.719135, -97.349921, 99),
        (130.719135, 45.650079, 76),
    ]]
    fillet(f14_edges, radius=F14_R)

    # F15
    f15_edges = [f1.edges().sort_by_distance(p)[0] for p in [
        (-154.280865, 187.650079, 97.5),
        (-164.280865, 187.650079, 97.5),
        (120.719135, 187.650079, 97.5),
        (130.719135, 187.650079, 97.5),
    ]]
    fillet(f15_edges, radius=F15_R)


with BuildPart() as f17:
    # F16 (on Top) → F17 (new body)
    with BuildSketch(Plane.XY):
        with Locations((-134.2808651924, -62.3499207135)):
            Rectangle(F16_W, F16_H)
    extrude(amount=-F17_DEPTH)

    # F18 (on face) → F19 (join)
    with BuildSketch(Plane(origin=(0, 0, -3), x_dir=(1, 0, 0), z_dir=(0, 0, -1))):
        with Locations((-134.2808651924, 95.8499207135)):
            Rectangle(F18_W, F18_H)
    extrude(amount=F19_DEPTH)

    # F20 (on face) → F21, piece 2 (join)
    with BuildSketch(Plane(origin=(0, 0, -23), x_dir=(1, 0, 0), z_dir=(0, 0, -1))):
        with Locations((-134.2808651924, 60.8499207135)):
            Rectangle(F20_W, F20_H_2)
        with Locations((-134.2808651924, 95.8499207135)):
            Rectangle(F20_W, F20_H_3)
    extrude(amount=F21_DEPTH)



with BuildPart() as f17b:
    # F16 (on Top) → F17, piece 2 (new body)
    with BuildSketch(Plane.XY):
        with Locations((100.7191348076, -62.3499207135)):
            Rectangle(F16_W, F16_H)
    extrude(amount=-F17_DEPTH)

    # F18 (on face) → F19, piece 2 (join)
    with BuildSketch(Plane(origin=(0, 0, -3), x_dir=(1, 0, 0), z_dir=(0, 0, -1))):
        with Locations((100.7191348076, 95.8499207135)):
            Rectangle(F18_W, F18_H)
    extrude(amount=F19_DEPTH)

    # F20 (on face) → F21 (join)
    with BuildSketch(Plane(origin=(0, 0, -23), x_dir=(1, 0, 0), z_dir=(0, 0, -1))):
        with Locations((100.7191348076, 62.3499207135)):
            Rectangle(F20_W, F20_H)
    extrude(amount=F21_DEPTH)


with BuildPart() as f17_1:
    add(f17.part)

    add(f17b.part)  # F23 merges F17b
    # F22 (on face) → F23 (join, through all)
    with BuildSketch(Plane.YZ.offset(-129.2808651924)):
        with Locations((-32.3499207135, -24.5)):
            Rectangle(F22_W, F22_H)
    extrude(amount=F23_DEPTH)

    # F24 (on face) → F25 (join)
    with BuildSketch(Plane(origin=(0, 0, -26), x_dir=(1, 0, 0), z_dir=(0, 0, -1))):
        with Locations((-137.7808651924, 32.3499207135)):
            Rectangle(F24_W, F24_H)
    extrude(amount=F25_DEPTH)

    # F26 (on face) → F27 (join, through all)
    with BuildSketch(Plane.YZ.offset(-136.2808651924)):
        with Locations((-32.3499207135, -69.5)):
            Rectangle(F26_W, F26_H)
    extrude(amount=F27_DEPTH)

    # F28 (on face) → F29 (join)
    with BuildSketch(Plane.XY.offset(-68)):
        with Locations((104.2191348077, -32.3499207135)):
            Rectangle(F28_W, F28_H)
    extrude(amount=F29_DEPTH)

    # F30
    f30_edges = [f17_1.edges().sort_by_distance(p)[0] for p in [
        (-129.280865, -27.349921, -1.5),
        (-139.280865, -27.349921, -1.5),
        (-134.280865, -97.349921, 0),
        (-134.280865, -97.349921, -26),
        (100.719135, -97.349921, 0),
        (100.719135, -97.349921, -26),
        (95.719135, -27.349921, -1.5),
        (105.719135, -27.349921, -1.5),
        (-139.280865, -32.349921, -71),
        (105.719135, -32.349921, -71),
        (104.219135, -37.349921, -48),
        (104.219135, -27.349921, -48),
    ]]
    fillet(f30_edges, radius=F30_R)


with BuildPart() as f32:
    # F31 (on face) → F32 (new body)
    with BuildSketch(Plane(origin=(0, 0, -3), x_dir=(1, 0, 0), z_dir=(0, 0, -1))):
        with BuildLine():
            ThreePointArc((-138.1987937689, 35.725209862), (-134.1987937689, 31.725209862), (-130.1987937689, 35.725209862))
            Line((-130.1987937689, 35.725209862), (-130.1987937689, 52.725209862))
            ThreePointArc((-130.1987937689, 52.725209862), (-134.1987937689, 56.725209862), (-138.1987937689, 52.725209862))
            Line((-138.1987937689, 52.725209862), (-138.1987937689, 35.725209862))
        make_face()
    extrude(amount=F32_DEPTH)


with BuildPart() as f32b:
    # F31 (on face) → F32, piece 2 (new body)
    with BuildSketch(Plane(origin=(0, 0, -3), x_dir=(1, 0, 0), z_dir=(0, 0, -1))):
        with BuildLine():
            ThreePointArc((104.6370633841, 52.725209862), (100.6370633841, 56.725209862), (96.6370633841, 52.725209862))
            Line((96.6370633841, 52.725209862), (96.6370633841, 35.725209862))
            ThreePointArc((96.6370633841, 35.725209862), (100.6370633841, 31.725209862), (104.6370633841, 35.725209862))
            Line((104.6370633841, 35.725209862), (104.6370633841, 52.725209862))
        make_face()
    extrude(amount=F32_DEPTH)


with BuildPart() as f32c:
    # F31 (on face) → F32, piece 3 (new body)
    with BuildSketch(Plane(origin=(0, 0, -3), x_dir=(1, 0, 0), z_dir=(0, 0, -1))):
        with BuildLine():
            ThreePointArc((104.6370633841, 86.9746315651), (100.6370633841, 90.9746315651), (96.6370633841, 86.9746315651))
            Line((96.6370633841, 86.9746315651), (96.6370633841, 69.9746315651))
            ThreePointArc((96.6370633841, 69.9746315651), (100.6370633841, 65.9746315651), (104.6370633841, 69.9746315651))
            Line((104.6370633841, 69.9746315651), (104.6370633841, 86.9746315651))
        make_face()
    extrude(amount=F32_DEPTH)


with BuildPart() as f32d:
    # F31 (on face) → F32, piece 4 (new body)
    with BuildSketch(Plane(origin=(0, 0, -3), x_dir=(1, 0, 0), z_dir=(0, 0, -1))):
        with BuildLine():
            Line((-138.1987937689, 86.9746315651), (-138.1987937689, 69.9746315651))
            ThreePointArc((-138.1987937689, 69.9746315651), (-134.1987937689, 65.9746315651), (-130.1987937689, 69.9746315651))
            Line((-130.1987937689, 69.9746315651), (-130.1987937689, 86.9746315651))
            ThreePointArc((-130.1987937689, 86.9746315651), (-134.1987937689, 90.9746315651), (-138.1987937689, 86.9746315651))
        make_face()
    extrude(amount=F32_DEPTH)


solid = Compound([f1.part, f17_1.part, f32.part, f32b.part, f32c.part, f32d.part])
